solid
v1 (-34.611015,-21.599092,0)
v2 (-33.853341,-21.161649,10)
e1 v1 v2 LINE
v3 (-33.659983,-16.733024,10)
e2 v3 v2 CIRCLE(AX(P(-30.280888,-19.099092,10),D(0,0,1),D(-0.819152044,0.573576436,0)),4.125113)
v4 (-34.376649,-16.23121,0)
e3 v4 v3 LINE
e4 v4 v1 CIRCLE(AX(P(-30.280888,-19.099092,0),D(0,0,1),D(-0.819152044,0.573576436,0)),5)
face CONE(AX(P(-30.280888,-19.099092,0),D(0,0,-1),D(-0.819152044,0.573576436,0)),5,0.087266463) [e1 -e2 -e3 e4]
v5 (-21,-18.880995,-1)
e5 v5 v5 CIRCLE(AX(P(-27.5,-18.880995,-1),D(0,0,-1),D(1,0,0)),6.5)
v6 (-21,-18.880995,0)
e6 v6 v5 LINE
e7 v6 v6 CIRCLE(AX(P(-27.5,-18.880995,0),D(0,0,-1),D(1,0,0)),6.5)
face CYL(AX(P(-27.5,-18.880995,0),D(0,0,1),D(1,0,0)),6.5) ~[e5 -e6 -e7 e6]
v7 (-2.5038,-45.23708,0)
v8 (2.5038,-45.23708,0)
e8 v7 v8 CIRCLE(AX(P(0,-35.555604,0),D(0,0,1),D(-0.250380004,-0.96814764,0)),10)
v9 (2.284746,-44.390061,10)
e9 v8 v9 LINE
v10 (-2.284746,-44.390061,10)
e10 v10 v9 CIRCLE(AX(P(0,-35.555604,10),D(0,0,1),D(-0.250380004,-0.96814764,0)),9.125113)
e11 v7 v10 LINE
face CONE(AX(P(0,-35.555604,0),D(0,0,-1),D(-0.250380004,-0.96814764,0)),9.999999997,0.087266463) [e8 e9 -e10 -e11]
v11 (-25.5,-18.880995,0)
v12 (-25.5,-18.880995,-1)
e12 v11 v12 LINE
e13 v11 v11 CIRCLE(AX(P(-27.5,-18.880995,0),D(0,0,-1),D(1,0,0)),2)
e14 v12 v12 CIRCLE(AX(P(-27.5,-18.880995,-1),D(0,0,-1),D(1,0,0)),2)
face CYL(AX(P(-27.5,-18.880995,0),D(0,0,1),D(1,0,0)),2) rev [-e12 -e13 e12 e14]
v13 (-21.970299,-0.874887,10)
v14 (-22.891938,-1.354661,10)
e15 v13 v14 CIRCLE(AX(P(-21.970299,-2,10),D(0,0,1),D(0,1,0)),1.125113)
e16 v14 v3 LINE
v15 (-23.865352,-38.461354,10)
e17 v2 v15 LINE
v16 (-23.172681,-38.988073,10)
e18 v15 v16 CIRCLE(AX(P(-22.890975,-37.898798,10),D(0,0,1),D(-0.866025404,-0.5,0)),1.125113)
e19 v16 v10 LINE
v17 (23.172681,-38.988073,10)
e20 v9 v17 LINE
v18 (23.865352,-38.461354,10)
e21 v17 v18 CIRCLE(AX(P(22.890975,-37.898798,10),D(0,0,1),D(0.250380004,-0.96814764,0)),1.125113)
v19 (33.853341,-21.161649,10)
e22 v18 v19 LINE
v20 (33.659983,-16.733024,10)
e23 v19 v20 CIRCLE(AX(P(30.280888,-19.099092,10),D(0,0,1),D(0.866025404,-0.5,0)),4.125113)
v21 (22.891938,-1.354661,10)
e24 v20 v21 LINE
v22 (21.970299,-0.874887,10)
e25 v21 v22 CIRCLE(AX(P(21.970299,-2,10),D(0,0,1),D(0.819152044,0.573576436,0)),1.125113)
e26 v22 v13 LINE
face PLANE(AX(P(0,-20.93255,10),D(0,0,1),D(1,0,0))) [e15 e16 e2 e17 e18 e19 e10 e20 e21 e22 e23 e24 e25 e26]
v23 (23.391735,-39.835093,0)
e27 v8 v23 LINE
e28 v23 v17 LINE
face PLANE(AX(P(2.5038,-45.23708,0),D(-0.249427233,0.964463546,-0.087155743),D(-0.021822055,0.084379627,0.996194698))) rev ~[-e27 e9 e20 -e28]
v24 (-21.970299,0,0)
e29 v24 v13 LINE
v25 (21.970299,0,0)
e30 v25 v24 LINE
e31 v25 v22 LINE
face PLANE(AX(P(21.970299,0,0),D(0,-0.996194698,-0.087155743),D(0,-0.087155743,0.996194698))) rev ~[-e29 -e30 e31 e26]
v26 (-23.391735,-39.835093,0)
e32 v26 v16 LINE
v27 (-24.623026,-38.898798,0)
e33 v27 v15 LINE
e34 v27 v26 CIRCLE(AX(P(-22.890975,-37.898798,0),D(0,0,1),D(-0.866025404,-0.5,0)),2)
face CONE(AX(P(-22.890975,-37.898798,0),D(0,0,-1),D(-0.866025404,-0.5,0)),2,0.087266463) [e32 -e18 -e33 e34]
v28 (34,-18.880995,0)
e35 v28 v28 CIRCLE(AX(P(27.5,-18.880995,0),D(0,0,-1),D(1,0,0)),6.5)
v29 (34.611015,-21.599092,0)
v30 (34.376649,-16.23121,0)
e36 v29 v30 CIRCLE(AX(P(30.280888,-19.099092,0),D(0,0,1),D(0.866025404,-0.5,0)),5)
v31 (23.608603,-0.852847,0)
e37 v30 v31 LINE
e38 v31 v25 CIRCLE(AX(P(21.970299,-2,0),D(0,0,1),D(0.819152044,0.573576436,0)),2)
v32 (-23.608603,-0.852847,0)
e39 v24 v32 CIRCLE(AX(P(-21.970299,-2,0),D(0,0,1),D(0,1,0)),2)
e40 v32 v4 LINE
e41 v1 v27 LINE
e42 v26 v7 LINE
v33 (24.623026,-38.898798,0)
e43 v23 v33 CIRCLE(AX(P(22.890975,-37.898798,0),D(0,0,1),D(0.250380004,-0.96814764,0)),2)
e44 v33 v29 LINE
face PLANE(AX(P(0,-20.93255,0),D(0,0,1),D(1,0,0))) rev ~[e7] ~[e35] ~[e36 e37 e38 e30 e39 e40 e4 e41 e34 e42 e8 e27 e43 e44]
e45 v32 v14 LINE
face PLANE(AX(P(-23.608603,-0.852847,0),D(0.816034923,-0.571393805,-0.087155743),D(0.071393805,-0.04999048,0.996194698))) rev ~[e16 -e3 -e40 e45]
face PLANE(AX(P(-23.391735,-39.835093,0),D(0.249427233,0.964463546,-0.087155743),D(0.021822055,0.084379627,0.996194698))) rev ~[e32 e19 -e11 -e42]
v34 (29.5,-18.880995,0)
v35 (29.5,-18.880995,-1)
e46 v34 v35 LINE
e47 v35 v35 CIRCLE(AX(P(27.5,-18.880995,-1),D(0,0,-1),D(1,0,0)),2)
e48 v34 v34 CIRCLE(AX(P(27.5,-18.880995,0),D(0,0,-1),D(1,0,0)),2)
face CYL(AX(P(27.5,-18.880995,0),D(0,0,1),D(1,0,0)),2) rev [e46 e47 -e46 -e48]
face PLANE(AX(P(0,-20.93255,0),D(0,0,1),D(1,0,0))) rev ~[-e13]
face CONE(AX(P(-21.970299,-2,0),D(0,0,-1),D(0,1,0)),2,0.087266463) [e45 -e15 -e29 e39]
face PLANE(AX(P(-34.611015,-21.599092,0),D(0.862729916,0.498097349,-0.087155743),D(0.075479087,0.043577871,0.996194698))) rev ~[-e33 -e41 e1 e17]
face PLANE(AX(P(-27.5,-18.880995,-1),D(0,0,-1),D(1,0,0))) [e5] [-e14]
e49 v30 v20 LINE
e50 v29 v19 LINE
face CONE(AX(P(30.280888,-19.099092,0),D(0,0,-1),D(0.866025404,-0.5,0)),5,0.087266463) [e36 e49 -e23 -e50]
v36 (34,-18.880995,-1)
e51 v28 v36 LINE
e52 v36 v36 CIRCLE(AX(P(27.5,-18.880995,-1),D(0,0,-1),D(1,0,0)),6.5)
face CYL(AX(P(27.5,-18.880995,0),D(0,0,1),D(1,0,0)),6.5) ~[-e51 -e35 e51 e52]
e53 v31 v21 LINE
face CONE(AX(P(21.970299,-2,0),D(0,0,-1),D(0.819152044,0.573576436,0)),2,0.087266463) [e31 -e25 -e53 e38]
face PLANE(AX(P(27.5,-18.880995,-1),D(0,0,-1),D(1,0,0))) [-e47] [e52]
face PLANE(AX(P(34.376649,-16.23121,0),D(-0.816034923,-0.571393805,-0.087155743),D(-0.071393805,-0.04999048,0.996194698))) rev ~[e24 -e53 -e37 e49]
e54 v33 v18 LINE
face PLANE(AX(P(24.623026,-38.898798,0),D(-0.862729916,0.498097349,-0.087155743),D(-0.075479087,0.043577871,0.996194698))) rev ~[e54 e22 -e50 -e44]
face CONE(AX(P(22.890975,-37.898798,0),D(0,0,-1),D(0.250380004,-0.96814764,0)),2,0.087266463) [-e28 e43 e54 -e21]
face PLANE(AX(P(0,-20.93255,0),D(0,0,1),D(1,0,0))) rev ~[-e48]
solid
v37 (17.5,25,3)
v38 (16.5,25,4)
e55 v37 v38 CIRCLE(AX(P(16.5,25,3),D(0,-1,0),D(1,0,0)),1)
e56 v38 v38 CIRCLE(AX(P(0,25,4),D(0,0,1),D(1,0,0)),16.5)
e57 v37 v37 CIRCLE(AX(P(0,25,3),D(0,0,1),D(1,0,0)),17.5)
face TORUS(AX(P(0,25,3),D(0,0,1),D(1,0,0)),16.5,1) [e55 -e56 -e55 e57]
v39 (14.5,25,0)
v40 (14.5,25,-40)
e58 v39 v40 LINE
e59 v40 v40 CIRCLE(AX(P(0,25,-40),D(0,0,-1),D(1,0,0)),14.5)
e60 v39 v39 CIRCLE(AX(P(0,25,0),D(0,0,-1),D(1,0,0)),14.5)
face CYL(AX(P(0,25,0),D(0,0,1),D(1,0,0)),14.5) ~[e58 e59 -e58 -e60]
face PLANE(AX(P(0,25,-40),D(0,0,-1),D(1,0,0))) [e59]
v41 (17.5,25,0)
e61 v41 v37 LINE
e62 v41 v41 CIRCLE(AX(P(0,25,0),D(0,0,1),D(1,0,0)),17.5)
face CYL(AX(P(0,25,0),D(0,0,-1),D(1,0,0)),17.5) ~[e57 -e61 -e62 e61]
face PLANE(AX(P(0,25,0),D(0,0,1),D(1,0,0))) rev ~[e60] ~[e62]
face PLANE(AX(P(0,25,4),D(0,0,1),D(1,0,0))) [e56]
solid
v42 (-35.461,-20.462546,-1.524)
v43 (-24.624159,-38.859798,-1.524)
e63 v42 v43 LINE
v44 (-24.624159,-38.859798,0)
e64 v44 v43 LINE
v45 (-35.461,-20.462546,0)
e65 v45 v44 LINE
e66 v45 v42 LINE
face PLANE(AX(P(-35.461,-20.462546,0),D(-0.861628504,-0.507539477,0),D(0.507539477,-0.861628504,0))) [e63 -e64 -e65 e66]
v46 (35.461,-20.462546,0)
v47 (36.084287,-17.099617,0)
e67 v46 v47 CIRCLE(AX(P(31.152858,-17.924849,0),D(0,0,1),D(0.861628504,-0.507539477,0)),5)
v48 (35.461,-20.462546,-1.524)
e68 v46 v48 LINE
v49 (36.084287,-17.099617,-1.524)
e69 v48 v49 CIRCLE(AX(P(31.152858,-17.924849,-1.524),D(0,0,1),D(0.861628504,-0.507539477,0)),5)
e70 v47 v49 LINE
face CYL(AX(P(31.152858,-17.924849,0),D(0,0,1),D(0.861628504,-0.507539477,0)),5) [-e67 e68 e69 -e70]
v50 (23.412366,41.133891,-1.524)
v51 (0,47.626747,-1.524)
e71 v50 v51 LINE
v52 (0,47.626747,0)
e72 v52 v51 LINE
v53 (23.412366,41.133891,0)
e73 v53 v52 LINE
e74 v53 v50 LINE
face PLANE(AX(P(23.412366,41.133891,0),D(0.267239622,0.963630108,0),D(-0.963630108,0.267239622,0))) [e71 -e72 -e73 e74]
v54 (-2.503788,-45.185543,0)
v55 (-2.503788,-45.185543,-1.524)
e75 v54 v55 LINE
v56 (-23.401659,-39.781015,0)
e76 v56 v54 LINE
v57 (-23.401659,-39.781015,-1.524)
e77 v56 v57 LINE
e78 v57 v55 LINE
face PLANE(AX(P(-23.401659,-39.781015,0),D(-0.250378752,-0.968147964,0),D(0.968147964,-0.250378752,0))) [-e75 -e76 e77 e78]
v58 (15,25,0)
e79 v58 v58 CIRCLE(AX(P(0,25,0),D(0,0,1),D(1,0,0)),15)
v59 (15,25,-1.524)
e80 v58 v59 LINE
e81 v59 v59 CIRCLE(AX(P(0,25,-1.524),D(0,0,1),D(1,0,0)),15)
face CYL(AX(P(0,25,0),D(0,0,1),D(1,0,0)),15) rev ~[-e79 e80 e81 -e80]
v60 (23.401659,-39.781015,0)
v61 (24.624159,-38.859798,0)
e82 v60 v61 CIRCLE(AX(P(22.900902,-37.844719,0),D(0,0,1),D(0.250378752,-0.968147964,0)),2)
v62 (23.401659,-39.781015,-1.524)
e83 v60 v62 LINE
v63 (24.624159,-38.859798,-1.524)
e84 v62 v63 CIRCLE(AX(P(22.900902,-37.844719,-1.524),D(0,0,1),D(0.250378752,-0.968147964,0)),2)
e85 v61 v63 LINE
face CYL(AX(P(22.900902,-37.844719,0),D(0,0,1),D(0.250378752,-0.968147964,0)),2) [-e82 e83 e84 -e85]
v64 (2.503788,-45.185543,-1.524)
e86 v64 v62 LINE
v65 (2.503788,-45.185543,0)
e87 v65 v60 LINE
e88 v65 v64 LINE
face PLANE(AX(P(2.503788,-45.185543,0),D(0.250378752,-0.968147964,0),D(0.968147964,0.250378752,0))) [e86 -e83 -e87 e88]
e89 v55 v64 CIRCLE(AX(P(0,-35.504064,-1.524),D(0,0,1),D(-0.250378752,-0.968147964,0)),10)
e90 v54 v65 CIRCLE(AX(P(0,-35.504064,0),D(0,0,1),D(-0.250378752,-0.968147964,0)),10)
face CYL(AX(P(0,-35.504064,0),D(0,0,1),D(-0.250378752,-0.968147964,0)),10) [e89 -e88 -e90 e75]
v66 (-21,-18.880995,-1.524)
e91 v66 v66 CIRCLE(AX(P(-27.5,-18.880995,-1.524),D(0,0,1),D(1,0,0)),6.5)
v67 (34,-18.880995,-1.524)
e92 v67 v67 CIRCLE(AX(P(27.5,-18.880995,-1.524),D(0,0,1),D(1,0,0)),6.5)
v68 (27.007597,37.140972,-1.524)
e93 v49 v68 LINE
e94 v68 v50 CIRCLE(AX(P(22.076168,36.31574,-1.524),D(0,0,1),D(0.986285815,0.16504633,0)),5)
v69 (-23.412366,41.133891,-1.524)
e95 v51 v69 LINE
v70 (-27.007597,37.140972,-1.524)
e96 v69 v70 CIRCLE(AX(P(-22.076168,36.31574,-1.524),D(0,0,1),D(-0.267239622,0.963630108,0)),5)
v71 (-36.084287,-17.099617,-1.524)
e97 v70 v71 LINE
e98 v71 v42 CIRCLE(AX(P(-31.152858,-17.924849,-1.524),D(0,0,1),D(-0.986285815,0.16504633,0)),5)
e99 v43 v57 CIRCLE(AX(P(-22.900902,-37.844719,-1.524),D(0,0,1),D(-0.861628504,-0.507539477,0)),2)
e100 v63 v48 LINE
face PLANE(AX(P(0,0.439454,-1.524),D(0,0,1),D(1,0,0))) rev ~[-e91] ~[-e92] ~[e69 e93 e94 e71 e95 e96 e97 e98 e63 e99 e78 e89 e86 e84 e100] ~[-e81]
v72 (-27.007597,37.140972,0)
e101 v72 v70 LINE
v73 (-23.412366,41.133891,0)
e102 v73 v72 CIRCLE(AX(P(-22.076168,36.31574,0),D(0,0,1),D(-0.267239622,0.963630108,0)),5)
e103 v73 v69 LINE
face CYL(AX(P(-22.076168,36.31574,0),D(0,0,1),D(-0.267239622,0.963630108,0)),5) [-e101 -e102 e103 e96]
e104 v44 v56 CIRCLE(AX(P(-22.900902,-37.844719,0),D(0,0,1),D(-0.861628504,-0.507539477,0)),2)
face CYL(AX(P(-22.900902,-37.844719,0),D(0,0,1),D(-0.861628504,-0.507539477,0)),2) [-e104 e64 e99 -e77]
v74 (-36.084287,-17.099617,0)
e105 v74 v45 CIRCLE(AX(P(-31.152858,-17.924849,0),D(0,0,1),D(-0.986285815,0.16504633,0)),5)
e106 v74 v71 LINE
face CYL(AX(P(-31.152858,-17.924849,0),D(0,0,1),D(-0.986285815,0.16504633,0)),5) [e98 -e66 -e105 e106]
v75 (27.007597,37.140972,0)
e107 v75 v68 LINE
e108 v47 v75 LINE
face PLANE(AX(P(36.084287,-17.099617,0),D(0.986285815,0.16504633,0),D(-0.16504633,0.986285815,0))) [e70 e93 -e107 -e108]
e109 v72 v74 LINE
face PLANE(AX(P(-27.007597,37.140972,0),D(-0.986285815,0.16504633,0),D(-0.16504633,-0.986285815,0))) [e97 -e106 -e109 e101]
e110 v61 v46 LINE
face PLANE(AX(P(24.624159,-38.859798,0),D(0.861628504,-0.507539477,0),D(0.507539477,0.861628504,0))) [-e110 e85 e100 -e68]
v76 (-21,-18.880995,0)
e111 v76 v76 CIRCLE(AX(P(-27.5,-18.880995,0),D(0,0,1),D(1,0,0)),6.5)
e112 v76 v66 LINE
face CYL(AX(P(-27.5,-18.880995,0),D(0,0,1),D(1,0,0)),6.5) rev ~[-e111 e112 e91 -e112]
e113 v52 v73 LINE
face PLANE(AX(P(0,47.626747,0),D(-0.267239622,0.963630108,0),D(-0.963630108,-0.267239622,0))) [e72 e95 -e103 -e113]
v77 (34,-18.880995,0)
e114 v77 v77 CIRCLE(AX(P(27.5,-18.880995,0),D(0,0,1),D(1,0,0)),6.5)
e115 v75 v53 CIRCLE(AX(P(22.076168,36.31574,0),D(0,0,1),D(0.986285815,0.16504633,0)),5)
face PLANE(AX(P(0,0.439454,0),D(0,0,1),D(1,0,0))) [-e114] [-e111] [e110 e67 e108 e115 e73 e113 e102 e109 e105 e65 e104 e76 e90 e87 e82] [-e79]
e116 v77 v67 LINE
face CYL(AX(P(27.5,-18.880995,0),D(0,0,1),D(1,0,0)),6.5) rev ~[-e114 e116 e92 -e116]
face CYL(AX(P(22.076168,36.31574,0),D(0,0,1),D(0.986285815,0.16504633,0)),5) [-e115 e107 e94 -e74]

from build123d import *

# Parameters (mm, degrees)
F1_DEPTH  = 10
F1_TAPER  = 5
F2_R      = 6.5
F2_R_2    = 2
F3_DEPTH  = 1
F4_R      = 17.5
F5_DEPTH  = 4
F6_R      = 1
F7_R      = 14.5
F8_DEPTH  = 40
F9_R      = 6.5
F9_R_2    = 15
F10_DEPTH = 1.524


with BuildPart() as f1:
    # F0 (on Top) → F1 (new body)
    with BuildSketch(Plane.XY):
        with BuildLine():
            Line((21.9702988723, 0), (0, 0))
            Line((0, 0), (-21.9702988723, 0))
            ThreePointArc((-21.9702988723, 0), (-22.8937960987, -0.2259783336), (-23.6086029609, -0.8528471273))
            Line((-23.6086029609, -0.8528471273), (-34.37664856, -16.2312099862))
            ThreePointArc((-34.37664856, -16.2312099862), (-35.2761294464, -18.8809952311), (-34.6110153574, -21.5990921679))
            Line((-34.6110153574, -21.5990921679), (-24.6230258112, -38.8987975274))
            ThreePointArc((-24.6230258112, -38.8987975274), (-24.1015629797, -39.4908015325), (-23.3917350118, -39.8350928082))
            Line((-23.3917350118, -39.8350928082), (-2.5038000405, -45.2370800926))
            ThreePointArc((-2.5038000405, -45.2370800926), (0, -45.5556036889), (2.5038000405, -45.2370800926))
            Line((2.5038000405, -45.2370800926), (23.3917350118, -39.8350928082))
            ThreePointArc((23.3917350118, -39.8350928082), (24.1015629797, -39.4908015325), (24.6230258112, -38.8987975274))
            Line((24.6230258112, -38.8987975274), (34.6110153574, -21.5990921679))
            ThreePointArc((34.6110153574, -21.5990921679), (35.2761294464, -18.8809952311), (34.37664856, -16.2312099862))
            Line((34.37664856, -16.2312099862), (23.6086029609, -0.8528471273))
            ThreePointArc((23.6086029609, -0.8528471273), (22.8937960987, -0.2259783336), (21.9702988723, 0))
        make_face()
    extrude(amount=F1_DEPTH, taper=F1_TAPER)

    # F2 (on face) → F3 (join)
    with BuildSketch(Plane(origin=(0, 0, 0), x_dir=(1, 0, 0), z_dir=(0, 0, -1))):
        with Locations((-27.5, 18.8809952311)):
            Circle(F2_R)
        with Locations((-27.5, 18.8809952311)):
            Circle(F2_R_2, mode=Mode.SUBTRACT)
        with Locations((27.5, 18.8809952311)):
            Circle(F2_R)
        with Locations((27.5, 18.8809952311)):
            Circle(F2_R_2, mode=Mode.SUBTRACT)
    extrude(amount=F3_DEPTH)


with BuildPart() as f5:
    # F4 (on Top) → F5 (new body)
    with BuildSketch(Plane.XY):
        with Locations((0, 25)):
            Circle(F4_R)
    extrude(amount=F5_DEPTH)

    # F6
    f6_edges = [f5.edges().sort_by_distance(p)[0] for p in [
        (-17.5, 25, 4),
    ]]
    fillet(f6_edges, radius=F6_R)

    # F7 (on face) → F8 (join)
    with BuildSketch(Plane(origin=(0, 0, 0), x_dir=(1, 0, 0), z_dir=(0, 0, -1))):
        with Locations((0, -25)):
            Circle(F7_R)
    extrude(amount=F8_DEPTH)


with BuildPart() as f10:
    # F9 (on Top) → F10 (new body)
    with BuildSketch(Plane.XY):
        with BuildLine():
            ThreePointArc((-36.0842868047, -17.0996168992), (-36.069131089, -18.8360325364), (-35.4610002497, -20.4625459372))
            Line((-35.4610002497, -20.4625459372), (-24.6241585752, -38.8597979669))
            ThreePointArc((-24.6241585752, -38.8597979669), (-24.1045295476, -39.441991589), (-23.401659071, -39.7810149406))
            Line((-23.401659071, -39.7810149406), (-2.5037875188, -45.1855431631))
            ThreePointArc((-2.5037875188, -45.1855431631), (0, -45.504063521), (2.5037875188, -45.1855431631))
            Line((2.5037875188, -45.1855431631), (23.401659071, -39.7810149406))
            ThreePointArc((23.401659071, -39.7810149406), (24.1045295476, -39.441991589), (24.6241585752, -38.8597979669))
            Line((24.6241585752, -38.8597979669), (35.4610002497, -20.4625459372))
            ThreePointArc((35.4610002497, -20.4625459372), (36.069131089, -18.8360325364), (36.0842868047, -17.0996168992))
            Line((36.0842868047, -17.0996168992), (27.0075972916, 37.1409717984))
            ThreePointArc((27.0075972916, 37.1409717984), (25.7918966711, 39.6613883732), (23.4123663286, 41.1338906851))
            Line((23.4123663286, 41.1338906851), (0, 47.6267471122))
            Line((0, 47.6267471122), (-23.4123663286, 41.1338906851))
            ThreePointArc((-23.4123663286, 41.1338906851), (-25.7918966711, 39.6613883732), (-27.0075972916, 37.1409717984))
            Line((-27.0075972916, 37.1409717984), (-36.0842868047, -17.0996168992))
        make_face()
        with Locations((-27.5, -18.8809952311)):
            Circle(F9_R, mode=Mode.SUBTRACT)
        with Locations((27.5, -18.8809952311)):
            Circle(F9_R, mode=Mode.SUBTRACT)
        with Locations((0, 25)):
            Circle(F9_R_2, mode=Mode.SUBTRACT)
    extrude(amount=-F10_DEPTH)


solid = Compound([f1.part, f5.part, f10.part])
